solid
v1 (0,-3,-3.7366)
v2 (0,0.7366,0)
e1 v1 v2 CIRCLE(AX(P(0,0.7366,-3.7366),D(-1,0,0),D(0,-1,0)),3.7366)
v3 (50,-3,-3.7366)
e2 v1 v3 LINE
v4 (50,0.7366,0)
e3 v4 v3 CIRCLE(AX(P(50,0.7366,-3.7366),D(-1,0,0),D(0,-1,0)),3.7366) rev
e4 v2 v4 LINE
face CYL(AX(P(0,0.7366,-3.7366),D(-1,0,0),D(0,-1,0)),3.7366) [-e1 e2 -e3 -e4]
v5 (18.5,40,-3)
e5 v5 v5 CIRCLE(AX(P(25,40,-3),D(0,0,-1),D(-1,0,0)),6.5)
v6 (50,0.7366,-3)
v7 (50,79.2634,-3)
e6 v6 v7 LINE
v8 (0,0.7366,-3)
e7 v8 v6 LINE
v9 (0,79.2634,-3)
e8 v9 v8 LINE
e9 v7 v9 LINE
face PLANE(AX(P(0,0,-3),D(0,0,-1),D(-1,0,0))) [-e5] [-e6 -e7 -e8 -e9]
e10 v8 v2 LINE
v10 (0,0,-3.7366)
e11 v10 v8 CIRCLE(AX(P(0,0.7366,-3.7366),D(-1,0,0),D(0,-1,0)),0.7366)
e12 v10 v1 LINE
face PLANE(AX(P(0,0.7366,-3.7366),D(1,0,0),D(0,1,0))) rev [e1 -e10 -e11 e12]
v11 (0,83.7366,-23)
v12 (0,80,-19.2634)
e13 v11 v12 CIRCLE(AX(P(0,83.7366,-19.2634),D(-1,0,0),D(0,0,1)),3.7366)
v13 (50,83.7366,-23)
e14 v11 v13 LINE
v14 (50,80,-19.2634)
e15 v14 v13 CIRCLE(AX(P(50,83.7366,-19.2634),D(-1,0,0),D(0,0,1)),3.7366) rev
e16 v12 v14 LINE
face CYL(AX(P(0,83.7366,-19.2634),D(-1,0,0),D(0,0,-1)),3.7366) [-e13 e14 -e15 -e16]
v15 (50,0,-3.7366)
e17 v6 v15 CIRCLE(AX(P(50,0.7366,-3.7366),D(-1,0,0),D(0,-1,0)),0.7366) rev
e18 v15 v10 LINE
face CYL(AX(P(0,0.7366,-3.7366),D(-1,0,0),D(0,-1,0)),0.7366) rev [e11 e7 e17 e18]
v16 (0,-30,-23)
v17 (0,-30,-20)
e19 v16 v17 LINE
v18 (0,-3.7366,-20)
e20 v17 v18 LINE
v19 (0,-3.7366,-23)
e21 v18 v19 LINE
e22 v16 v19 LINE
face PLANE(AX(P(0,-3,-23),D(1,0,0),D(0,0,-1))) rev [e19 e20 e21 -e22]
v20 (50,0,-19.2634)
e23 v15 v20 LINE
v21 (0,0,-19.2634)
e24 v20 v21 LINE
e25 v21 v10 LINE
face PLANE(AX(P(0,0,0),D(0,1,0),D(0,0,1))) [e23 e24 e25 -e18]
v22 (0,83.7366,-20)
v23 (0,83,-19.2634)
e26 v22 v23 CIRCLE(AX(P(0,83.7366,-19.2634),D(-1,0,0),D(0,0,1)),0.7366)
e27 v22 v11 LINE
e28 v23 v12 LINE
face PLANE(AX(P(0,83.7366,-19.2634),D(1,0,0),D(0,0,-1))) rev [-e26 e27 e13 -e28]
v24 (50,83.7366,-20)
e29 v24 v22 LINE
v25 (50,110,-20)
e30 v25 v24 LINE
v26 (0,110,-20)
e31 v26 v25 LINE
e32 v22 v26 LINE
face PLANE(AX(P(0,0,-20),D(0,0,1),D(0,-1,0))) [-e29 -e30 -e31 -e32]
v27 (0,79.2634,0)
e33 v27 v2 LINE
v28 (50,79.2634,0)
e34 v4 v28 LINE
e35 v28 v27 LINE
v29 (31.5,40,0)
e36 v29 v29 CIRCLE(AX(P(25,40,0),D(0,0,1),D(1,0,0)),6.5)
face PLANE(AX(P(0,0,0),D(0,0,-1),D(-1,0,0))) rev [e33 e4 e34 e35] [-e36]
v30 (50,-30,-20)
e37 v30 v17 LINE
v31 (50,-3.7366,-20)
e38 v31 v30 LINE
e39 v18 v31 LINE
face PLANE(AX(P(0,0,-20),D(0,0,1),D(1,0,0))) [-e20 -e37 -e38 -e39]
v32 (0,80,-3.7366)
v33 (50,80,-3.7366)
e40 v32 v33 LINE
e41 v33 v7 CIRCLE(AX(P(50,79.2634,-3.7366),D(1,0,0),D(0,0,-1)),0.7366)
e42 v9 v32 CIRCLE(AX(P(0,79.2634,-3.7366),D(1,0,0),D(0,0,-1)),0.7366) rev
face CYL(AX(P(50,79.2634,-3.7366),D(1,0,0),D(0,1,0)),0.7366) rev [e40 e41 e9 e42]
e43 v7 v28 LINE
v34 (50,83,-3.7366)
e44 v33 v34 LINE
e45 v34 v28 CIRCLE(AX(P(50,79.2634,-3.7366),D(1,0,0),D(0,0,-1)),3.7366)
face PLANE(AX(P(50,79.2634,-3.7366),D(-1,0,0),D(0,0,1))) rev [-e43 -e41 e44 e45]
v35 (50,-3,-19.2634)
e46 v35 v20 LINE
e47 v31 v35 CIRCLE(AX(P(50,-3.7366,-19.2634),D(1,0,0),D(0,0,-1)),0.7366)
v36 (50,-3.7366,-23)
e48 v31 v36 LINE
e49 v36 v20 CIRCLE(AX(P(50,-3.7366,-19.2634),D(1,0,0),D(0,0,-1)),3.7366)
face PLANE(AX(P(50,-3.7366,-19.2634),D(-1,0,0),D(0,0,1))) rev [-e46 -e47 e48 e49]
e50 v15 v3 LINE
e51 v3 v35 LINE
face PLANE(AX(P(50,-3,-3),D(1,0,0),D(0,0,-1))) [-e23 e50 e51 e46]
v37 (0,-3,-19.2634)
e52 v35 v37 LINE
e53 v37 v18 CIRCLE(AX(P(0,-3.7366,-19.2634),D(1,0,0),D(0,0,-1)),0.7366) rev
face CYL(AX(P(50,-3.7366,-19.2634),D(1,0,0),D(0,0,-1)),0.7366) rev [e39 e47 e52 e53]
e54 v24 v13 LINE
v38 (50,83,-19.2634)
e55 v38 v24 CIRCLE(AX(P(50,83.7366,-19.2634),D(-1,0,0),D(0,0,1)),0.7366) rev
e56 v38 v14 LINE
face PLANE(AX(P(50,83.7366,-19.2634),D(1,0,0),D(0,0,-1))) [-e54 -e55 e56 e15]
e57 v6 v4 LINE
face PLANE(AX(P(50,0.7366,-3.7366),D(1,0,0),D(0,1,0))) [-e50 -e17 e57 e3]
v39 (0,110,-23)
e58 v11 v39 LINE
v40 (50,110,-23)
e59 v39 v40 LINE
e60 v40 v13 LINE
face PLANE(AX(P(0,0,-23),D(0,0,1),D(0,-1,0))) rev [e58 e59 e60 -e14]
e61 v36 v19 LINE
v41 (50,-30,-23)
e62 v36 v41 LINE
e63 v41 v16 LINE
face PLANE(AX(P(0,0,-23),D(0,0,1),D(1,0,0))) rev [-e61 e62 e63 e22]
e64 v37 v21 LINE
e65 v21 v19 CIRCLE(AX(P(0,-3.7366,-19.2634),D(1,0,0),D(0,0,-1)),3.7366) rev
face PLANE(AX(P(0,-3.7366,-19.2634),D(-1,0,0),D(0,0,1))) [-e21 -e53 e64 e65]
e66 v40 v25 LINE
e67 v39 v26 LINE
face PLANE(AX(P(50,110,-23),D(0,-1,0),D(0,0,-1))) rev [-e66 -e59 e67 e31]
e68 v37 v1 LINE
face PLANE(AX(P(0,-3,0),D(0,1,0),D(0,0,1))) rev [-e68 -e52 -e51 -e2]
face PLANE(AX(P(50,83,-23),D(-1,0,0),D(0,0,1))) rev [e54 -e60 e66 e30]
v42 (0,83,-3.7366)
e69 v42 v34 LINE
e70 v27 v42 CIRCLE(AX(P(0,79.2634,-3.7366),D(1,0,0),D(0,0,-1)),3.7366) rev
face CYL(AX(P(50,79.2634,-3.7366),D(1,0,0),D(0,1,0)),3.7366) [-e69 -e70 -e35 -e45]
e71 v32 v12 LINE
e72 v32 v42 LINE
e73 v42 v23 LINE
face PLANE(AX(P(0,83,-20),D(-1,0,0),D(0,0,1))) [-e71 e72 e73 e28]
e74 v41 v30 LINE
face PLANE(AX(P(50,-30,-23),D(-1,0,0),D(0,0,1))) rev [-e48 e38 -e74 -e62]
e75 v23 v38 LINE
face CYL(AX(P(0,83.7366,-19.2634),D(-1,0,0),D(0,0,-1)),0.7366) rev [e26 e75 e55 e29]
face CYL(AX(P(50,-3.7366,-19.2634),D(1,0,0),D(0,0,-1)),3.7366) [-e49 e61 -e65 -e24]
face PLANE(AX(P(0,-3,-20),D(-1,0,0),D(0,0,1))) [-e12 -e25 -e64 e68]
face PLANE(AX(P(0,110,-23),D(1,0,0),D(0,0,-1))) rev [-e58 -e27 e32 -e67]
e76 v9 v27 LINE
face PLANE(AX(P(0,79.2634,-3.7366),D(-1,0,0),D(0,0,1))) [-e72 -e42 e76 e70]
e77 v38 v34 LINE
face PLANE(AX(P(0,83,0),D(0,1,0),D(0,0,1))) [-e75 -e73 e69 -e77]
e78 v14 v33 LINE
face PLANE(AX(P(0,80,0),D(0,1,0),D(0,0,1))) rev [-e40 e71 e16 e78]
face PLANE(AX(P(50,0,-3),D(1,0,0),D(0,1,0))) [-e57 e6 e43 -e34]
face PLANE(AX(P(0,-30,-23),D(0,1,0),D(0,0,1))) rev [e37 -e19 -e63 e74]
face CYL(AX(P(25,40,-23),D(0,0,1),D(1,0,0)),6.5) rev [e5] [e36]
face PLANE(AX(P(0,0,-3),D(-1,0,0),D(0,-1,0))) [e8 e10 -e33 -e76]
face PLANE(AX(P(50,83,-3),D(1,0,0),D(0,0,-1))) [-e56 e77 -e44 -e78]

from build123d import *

# Parameters (mm, degrees)
SKETCH_1_W                         = 50
SKETCH_1_H                         = 80
SM_BASE_FLANGE_1_DEPTH             = 3
SM_EDGE_FLANGE_1_STRIP_W           = 13.4732
SM_EDGE_FLANGE_1_STRIP_H           = 3
SM_EDGE_FLANGE_1_STRIP_CUT_DEPTH   = 50
SM_EDGE_FLANGE_1_STRIP_2_W         = 13.4732
SM_EDGE_FLANGE_1_STRIP_2_H         = 3
SM_EDGE_FLANGE_1_STRIP_CUT_2_DEPTH = 50
SM_EDGE_FLANGE_1_DEPTH             = 50
SM_EDGE_FLANGE_1_BEND_DEPTH        = 50
SM_EDGE_FLANGE_2_STRIP_W           = 13.4732
SM_EDGE_FLANGE_2_STRIP_H           = 3
SM_EDGE_FLANGE_2_STRIP_CUT_DEPTH   = 50
SM_EDGE_FLANGE_2_STRIP_2_W         = 13.4732
SM_EDGE_FLANGE_2_STRIP_2_H         = 3
SM_EDGE_FLANGE_2_STRIP_CUT_2_DEPTH = 50
SM_EDGE_FLANGE_2_DEPTH             = 50
SM_EDGE_FLANGE_2_BEND_DEPTH        = 50
SKETCH_18_R                        = 6.5
CUT_EXTRUDE_1_DEPTH                = 124


# Sheet-metal steps are written as plain solids
with BuildPart() as part:
    # Sketch 1 → 基体-法兰1 (new body)
    with BuildSketch(Plane.XY):
        with Locations((25, 40)):
            Rectangle(SKETCH_1_W, SKETCH_1_H)
    extrude(amount=-SM_BASE_FLANGE_1_DEPTH)

    # 边线-法兰1 strip (across the edge) → 边线-法兰1 strip cut (cut)
    with BuildSketch(Plane(origin=(0, 80, -3), x_dir=(0, -1, 0), z_dir=(1, 0, 0))):
        with Locations((-6, -1.5)):
            Rectangle(SM_EDGE_FLANGE_1_STRIP_W, SM_EDGE_FLANGE_1_STRIP_H)
    extrude(amount=SM_EDGE_FLANGE_1_STRIP_CUT_DEPTH, mode=Mode.SUBTRACT)

    # 边线-法兰1 strip 2 (across the edge) → 边线-法兰1 strip cut 2 (cut)
    with BuildSketch(Plane(origin=(50, 0, -3), x_dir=(0, 1, 0), z_dir=(-1, 0, 0))):
        with Locations((-6, -1.5)):
            Rectangle(SM_EDGE_FLANGE_1_STRIP_2_W, SM_EDGE_FLANGE_1_STRIP_2_H)
    extrude(amount=SM_EDGE_FLANGE_1_STRIP_CUT_2_DEPTH, mode=Mode.SUBTRACT)

    # 边线-法兰1 section (across the edge) → 边线-法兰1 (add)
    with BuildSketch(Plane(origin=(0, 80, -3), x_dir=(0, -1, 0), z_dir=(1, 0, 0))):
        with BuildLine():
            Line((-3, 0.7366), (-3, 17))
            Line((-3, 17), (0, 17))
            Line((0, 17), (0, 0.7366))
            ThreePointArc((0, 0.7366), (0.215745145, 0.215745145), (0.7366, 0))
            Line((0.7366, 0), (0.7366, -3))
            ThreePointArc((0.7366, -3), (-1.905575199, -1.905575199), (-3, 0.7366))
        make_face()
    extrude(amount=SM_EDGE_FLANGE_1_DEPTH)

    # 边线-法兰1 section 2 (across the edge) → 边线-法兰1 bend (add)
    with BuildSketch(Plane(origin=(50, 0, -3), x_dir=(0, 1, 0), z_dir=(-1, 0, 0))):
        with BuildLine():
            Line((-3, 0.7366), (-3, 17))
            Line((-3, 17), (0, 17))
            Line((0, 17), (0, 0.7366))
            ThreePointArc((0, 0.7366), (0.215745145, 0.215745145), (0.7366, 0))
            Line((0.7366, 0), (0.7366, -3))
            ThreePointArc((0.7366, -3), (-1.905575199, -1.905575199), (-3, 0.7366))
        make_face()
    extrude(amount=SM_EDGE_FLANGE_1_BEND_DEPTH)

    # 边线-法兰2 strip (across the edge) → 边线-法兰2 strip cut (cut)
    with BuildSketch(Plane(origin=(0, -3, -20), x_dir=(0, 0, 1), z_dir=(1, 0, 0))):
        with Locations((-6, -1.5)):
            Rectangle(SM_EDGE_FLANGE_2_STRIP_W, SM_EDGE_FLANGE_2_STRIP_H)
    extrude(amount=SM_EDGE_FLANGE_2_STRIP_CUT_DEPTH, mode=Mode.SUBTRACT)

    # 边线-法兰2 strip 2 (across the edge) → 边线-法兰2 strip cut 2 (cut)
    with BuildSketch(Plane(origin=(50, 83, -20), x_dir=(0, 0, 1), z_dir=(-1, 0, 0))):
        with Locations((-6, -1.5)):
            Rectangle(SM_EDGE_FLANGE_2_STRIP_2_W, SM_EDGE_FLANGE_2_STRIP_2_H)
    extrude(amount=SM_EDGE_FLANGE_2_STRIP_CUT_2_DEPTH, mode=Mode.SUBTRACT)

    # 边线-法兰2 section (across the edge) → 边线-法兰2 (add)
    with BuildSketch(Plane(origin=(0, -3, -20), x_dir=(0, 0, 1), z_dir=(1, 0, 0))):
        with BuildLine():
            Line((-3, 0.7366), (-3, 27))
            Line((-3, 27), (0, 27))
            Line((0, 27), (0, 0.7366))
            ThreePointArc((0, 0.7366), (0.215745145, 0.215745145), (0.7366, 0))
            Line((0.7366, 0), (0.7366, -3))
            ThreePointArc((0.7366, -3), (-1.905575199, -1.905575199), (-3, 0.7366))
        make_face()
    extrude(amount=SM_EDGE_FLANGE_2_DEPTH)

    # 边线-法兰2 section 2 (across the edge) → 边线-法兰2 bend (add)
    with BuildSketch(Plane(origin=(50, 83, -20), x_dir=(0, 0, 1), z_dir=(-1, 0, 0))):
        with BuildLine():
            Line((-3, 0.7366), (-3, 27))
            Line((-3, 27), (0, 27))
            Line((0, 27), (0, 0.7366))
            ThreePointArc((0, 0.7366), (0.215745145, 0.215745145), (0.7366, 0))
            Line((0.7366, 0), (0.7366, -3))
            ThreePointArc((0.7366, -3), (-1.905575199, -1.905575199), (-3, 0.7366))
        make_face()
    extrude(amount=SM_EDGE_FLANGE_2_BEND_DEPTH)

    # 草图18 → 切除-拉伸1 (cut, through all)
    with BuildSketch(Plane.XY):
        with Locations((25, 40)):
            Circle(SKETCH_18_R)
    extrude(amount=-CUT_EXTRUDE_1_DEPTH, mode=Mode.SUBTRACT)


solid = part.part
